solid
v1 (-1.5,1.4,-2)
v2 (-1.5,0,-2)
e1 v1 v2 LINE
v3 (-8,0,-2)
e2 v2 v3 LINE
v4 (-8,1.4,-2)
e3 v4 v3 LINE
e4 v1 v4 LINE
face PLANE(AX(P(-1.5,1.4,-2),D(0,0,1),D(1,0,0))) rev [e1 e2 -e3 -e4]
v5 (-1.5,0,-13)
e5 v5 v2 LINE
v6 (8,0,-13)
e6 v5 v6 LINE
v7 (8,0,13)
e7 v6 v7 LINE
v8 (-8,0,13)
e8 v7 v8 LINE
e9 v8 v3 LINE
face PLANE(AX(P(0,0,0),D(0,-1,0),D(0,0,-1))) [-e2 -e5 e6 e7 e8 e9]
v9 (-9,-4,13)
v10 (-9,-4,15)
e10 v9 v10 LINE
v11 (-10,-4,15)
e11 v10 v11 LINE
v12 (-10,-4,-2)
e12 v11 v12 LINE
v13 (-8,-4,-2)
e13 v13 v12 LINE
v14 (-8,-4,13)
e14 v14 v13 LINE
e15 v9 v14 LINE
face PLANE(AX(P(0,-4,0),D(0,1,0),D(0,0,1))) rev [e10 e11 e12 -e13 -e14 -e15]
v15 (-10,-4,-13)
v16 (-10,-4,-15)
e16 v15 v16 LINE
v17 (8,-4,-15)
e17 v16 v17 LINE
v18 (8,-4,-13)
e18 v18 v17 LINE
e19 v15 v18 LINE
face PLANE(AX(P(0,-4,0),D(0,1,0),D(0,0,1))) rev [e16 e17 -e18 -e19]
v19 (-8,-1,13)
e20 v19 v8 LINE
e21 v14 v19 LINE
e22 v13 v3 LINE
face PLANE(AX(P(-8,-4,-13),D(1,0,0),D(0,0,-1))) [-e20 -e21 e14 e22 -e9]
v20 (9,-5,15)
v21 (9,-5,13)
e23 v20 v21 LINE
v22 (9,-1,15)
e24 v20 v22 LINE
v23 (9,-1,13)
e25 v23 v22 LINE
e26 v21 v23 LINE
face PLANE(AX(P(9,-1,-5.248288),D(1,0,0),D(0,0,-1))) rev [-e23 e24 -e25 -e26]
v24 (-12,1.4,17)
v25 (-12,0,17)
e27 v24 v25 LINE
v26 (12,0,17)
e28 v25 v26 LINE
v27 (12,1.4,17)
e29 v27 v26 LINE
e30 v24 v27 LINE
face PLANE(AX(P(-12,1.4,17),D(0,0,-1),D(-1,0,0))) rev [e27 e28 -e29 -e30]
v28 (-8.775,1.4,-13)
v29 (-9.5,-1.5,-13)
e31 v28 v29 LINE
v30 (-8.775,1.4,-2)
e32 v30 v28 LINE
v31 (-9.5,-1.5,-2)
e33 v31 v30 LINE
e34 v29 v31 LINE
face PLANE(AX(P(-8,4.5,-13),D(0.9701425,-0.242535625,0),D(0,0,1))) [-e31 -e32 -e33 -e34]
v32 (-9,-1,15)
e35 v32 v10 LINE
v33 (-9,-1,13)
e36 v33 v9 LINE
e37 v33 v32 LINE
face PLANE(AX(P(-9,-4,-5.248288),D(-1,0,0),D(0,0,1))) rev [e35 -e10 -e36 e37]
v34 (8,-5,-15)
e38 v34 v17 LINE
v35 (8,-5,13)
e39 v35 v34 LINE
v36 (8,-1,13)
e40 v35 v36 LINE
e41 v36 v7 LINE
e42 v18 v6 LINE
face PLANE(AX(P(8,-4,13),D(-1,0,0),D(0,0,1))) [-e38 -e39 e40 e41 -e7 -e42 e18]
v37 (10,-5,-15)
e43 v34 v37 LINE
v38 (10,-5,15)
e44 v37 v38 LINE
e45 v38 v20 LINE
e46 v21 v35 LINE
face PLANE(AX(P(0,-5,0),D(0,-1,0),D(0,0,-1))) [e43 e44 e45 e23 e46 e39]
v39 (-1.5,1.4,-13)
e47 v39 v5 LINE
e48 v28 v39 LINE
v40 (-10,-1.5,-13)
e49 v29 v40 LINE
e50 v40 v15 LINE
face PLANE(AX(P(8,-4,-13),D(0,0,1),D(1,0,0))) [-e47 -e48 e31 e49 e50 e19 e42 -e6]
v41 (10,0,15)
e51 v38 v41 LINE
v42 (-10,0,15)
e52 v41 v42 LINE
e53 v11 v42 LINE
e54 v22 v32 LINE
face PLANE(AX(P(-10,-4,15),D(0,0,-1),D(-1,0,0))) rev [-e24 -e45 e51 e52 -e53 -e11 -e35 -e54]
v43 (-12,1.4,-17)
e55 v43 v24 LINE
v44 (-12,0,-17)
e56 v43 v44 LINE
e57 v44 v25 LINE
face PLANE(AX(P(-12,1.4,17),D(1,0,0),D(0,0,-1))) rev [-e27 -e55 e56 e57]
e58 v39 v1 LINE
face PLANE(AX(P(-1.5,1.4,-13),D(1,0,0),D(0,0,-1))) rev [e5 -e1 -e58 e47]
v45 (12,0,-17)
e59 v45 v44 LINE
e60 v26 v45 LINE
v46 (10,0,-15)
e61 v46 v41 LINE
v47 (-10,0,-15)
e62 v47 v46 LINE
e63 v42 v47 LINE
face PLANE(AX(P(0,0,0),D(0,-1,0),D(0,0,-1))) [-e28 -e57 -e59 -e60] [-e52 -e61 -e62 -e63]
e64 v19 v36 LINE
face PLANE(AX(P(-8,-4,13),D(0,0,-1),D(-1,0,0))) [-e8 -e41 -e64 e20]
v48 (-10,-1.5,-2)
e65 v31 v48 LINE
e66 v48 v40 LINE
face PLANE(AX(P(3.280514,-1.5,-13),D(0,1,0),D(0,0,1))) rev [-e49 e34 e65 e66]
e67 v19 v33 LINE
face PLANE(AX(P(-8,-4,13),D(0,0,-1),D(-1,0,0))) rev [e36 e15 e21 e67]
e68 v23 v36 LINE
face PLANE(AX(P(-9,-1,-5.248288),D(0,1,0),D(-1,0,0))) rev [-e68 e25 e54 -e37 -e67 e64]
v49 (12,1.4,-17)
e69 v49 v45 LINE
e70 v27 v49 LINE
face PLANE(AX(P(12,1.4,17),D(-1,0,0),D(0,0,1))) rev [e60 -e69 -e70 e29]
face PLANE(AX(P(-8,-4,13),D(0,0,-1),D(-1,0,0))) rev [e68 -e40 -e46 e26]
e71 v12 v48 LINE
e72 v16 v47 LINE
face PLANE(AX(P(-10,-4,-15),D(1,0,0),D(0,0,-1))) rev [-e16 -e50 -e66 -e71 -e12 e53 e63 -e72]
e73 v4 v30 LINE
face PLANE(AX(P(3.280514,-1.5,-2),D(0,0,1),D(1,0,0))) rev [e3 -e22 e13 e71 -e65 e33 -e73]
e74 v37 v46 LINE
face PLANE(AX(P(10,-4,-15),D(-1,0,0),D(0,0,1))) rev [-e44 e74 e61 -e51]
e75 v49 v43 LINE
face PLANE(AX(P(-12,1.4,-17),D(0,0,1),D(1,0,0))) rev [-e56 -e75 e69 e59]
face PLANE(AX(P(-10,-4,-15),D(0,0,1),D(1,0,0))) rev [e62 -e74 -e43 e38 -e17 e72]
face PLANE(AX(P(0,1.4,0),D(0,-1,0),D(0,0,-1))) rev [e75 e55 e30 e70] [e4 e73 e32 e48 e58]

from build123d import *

# Parameters (mm, degrees)
SZKIC1_W                    = 24
SZKIC1_H                    = 34
DODANIE_WYCI_GNI_CIE1_DEPTH = 1.4
SZKIC2_W                    = 20
SZKIC2_H                    = 30
SZKIC2_W_2                  = 16
SZKIC2_H_2                  = 26
DODANIE_WYCI_GNI_CIE2_DEPTH = 4
SZKIC3_W                    = 6.5
SZKIC3_H                    = 11
WYTNIJ_WYCI_GNI_CIE1_DEPTH  = 22.1896201
SZKIC4_W                    = 18
SZKIC4_H                    = 3
WYTNIJ_WYCI_GNI_CIE2_DEPTH  = 2
SZKIC5_W                    = 11
SZKIC5_H                    = 2.5
WYTNIJ_WYCI_GNI_CIE3_DEPTH  = 2
SFAZOWANIE1_SIZE            = 1.5
SFAZOWANIE1_SIZE_2          = 6
DODANIE_WYCI_GNI_CIE3_DEPTH = 1


with BuildPart() as part:
    # Szkic1 → Dodanie-wyciągnięcie1 (new body)
    with BuildSketch(Plane(origin=(0, 0, 0), x_dir=(1, 0, 0), z_dir=(0, 1, 0))):
        Rectangle(SZKIC1_W, SZKIC1_H)
    extrude(amount=DODANIE_WYCI_GNI_CIE1_DEPTH)

    # Szkic2 → Dodanie-wyciągnięcie2 (add)
    with BuildSketch(Plane.XZ):
        Rectangle(SZKIC2_W, SZKIC2_H)
        Rectangle(SZKIC2_W_2, SZKIC2_H_2, mode=Mode.SUBTRACT)
    extrude(amount=DODANIE_WYCI_GNI_CIE2_DEPTH)

    # Szkic3 → Wytnij-wyciągnięcie1 (cut, through all)
    with BuildSketch(Plane.XZ):
        with Locations((-4.75, -7.5)):
            Rectangle(SZKIC3_W, SZKIC3_H)
    extrude(amount=-WYTNIJ_WYCI_GNI_CIE1_DEPTH, mode=Mode.SUBTRACT)

    # Szkic4 → Wytnij-wyciągnięcie2 (cut)
    with BuildSketch(Plane.XY.offset(15)):
        with Locations((0, -2.5)):
            Rectangle(SZKIC4_W, SZKIC4_H)
    extrude(amount=-WYTNIJ_WYCI_GNI_CIE2_DEPTH, mode=Mode.SUBTRACT)

    # Szkic5 → Wytnij-wyciągnięcie3 (cut)
    with BuildSketch(Plane.ZY.offset(10)):
        with Locations((-7.5, -2.75)):
            Rectangle(SZKIC5_W, SZKIC5_H)
    extrude(amount=-WYTNIJ_WYCI_GNI_CIE3_DEPTH, mode=Mode.SUBTRACT)

    # Sfazowanie1
    # the kernel refuses this chamfer: 6, 1.5 mm, written as the material it takes off along each edge
    with BuildSketch(Plane(origin=(-8, -1.5, -13), x_dir=(-0.9890197255468893, -0.14778356633657133, 0), z_dir=(0, 0, 1))) as sfazowanie1_piece_1:
        Polygon((SFAZOWANIE1_SIZE * 0.989019725547, -SFAZOWANIE1_SIZE * 0.147783566337), (-SFAZOWANIE1_SIZE_2 * 0.147783566337, -SFAZOWANIE1_SIZE_2 * 0.989019725547), (0, 0), align=None)
    extrude(amount=11, mode=Mode.SUBTRACT)

    # Szkic6 → Dodanie-wyciągnięcie3 (add)
    with BuildSketch(Plane.XZ.offset(4)):
        Polygon((10, -15), (8, -15), (8, 13), (9, 13), (9, 15), (10, 15), (10, 13), align=None)
    extrude(amount=DODANIE_WYCI_GNI_CIE3_DEPTH)


solid = part.part
